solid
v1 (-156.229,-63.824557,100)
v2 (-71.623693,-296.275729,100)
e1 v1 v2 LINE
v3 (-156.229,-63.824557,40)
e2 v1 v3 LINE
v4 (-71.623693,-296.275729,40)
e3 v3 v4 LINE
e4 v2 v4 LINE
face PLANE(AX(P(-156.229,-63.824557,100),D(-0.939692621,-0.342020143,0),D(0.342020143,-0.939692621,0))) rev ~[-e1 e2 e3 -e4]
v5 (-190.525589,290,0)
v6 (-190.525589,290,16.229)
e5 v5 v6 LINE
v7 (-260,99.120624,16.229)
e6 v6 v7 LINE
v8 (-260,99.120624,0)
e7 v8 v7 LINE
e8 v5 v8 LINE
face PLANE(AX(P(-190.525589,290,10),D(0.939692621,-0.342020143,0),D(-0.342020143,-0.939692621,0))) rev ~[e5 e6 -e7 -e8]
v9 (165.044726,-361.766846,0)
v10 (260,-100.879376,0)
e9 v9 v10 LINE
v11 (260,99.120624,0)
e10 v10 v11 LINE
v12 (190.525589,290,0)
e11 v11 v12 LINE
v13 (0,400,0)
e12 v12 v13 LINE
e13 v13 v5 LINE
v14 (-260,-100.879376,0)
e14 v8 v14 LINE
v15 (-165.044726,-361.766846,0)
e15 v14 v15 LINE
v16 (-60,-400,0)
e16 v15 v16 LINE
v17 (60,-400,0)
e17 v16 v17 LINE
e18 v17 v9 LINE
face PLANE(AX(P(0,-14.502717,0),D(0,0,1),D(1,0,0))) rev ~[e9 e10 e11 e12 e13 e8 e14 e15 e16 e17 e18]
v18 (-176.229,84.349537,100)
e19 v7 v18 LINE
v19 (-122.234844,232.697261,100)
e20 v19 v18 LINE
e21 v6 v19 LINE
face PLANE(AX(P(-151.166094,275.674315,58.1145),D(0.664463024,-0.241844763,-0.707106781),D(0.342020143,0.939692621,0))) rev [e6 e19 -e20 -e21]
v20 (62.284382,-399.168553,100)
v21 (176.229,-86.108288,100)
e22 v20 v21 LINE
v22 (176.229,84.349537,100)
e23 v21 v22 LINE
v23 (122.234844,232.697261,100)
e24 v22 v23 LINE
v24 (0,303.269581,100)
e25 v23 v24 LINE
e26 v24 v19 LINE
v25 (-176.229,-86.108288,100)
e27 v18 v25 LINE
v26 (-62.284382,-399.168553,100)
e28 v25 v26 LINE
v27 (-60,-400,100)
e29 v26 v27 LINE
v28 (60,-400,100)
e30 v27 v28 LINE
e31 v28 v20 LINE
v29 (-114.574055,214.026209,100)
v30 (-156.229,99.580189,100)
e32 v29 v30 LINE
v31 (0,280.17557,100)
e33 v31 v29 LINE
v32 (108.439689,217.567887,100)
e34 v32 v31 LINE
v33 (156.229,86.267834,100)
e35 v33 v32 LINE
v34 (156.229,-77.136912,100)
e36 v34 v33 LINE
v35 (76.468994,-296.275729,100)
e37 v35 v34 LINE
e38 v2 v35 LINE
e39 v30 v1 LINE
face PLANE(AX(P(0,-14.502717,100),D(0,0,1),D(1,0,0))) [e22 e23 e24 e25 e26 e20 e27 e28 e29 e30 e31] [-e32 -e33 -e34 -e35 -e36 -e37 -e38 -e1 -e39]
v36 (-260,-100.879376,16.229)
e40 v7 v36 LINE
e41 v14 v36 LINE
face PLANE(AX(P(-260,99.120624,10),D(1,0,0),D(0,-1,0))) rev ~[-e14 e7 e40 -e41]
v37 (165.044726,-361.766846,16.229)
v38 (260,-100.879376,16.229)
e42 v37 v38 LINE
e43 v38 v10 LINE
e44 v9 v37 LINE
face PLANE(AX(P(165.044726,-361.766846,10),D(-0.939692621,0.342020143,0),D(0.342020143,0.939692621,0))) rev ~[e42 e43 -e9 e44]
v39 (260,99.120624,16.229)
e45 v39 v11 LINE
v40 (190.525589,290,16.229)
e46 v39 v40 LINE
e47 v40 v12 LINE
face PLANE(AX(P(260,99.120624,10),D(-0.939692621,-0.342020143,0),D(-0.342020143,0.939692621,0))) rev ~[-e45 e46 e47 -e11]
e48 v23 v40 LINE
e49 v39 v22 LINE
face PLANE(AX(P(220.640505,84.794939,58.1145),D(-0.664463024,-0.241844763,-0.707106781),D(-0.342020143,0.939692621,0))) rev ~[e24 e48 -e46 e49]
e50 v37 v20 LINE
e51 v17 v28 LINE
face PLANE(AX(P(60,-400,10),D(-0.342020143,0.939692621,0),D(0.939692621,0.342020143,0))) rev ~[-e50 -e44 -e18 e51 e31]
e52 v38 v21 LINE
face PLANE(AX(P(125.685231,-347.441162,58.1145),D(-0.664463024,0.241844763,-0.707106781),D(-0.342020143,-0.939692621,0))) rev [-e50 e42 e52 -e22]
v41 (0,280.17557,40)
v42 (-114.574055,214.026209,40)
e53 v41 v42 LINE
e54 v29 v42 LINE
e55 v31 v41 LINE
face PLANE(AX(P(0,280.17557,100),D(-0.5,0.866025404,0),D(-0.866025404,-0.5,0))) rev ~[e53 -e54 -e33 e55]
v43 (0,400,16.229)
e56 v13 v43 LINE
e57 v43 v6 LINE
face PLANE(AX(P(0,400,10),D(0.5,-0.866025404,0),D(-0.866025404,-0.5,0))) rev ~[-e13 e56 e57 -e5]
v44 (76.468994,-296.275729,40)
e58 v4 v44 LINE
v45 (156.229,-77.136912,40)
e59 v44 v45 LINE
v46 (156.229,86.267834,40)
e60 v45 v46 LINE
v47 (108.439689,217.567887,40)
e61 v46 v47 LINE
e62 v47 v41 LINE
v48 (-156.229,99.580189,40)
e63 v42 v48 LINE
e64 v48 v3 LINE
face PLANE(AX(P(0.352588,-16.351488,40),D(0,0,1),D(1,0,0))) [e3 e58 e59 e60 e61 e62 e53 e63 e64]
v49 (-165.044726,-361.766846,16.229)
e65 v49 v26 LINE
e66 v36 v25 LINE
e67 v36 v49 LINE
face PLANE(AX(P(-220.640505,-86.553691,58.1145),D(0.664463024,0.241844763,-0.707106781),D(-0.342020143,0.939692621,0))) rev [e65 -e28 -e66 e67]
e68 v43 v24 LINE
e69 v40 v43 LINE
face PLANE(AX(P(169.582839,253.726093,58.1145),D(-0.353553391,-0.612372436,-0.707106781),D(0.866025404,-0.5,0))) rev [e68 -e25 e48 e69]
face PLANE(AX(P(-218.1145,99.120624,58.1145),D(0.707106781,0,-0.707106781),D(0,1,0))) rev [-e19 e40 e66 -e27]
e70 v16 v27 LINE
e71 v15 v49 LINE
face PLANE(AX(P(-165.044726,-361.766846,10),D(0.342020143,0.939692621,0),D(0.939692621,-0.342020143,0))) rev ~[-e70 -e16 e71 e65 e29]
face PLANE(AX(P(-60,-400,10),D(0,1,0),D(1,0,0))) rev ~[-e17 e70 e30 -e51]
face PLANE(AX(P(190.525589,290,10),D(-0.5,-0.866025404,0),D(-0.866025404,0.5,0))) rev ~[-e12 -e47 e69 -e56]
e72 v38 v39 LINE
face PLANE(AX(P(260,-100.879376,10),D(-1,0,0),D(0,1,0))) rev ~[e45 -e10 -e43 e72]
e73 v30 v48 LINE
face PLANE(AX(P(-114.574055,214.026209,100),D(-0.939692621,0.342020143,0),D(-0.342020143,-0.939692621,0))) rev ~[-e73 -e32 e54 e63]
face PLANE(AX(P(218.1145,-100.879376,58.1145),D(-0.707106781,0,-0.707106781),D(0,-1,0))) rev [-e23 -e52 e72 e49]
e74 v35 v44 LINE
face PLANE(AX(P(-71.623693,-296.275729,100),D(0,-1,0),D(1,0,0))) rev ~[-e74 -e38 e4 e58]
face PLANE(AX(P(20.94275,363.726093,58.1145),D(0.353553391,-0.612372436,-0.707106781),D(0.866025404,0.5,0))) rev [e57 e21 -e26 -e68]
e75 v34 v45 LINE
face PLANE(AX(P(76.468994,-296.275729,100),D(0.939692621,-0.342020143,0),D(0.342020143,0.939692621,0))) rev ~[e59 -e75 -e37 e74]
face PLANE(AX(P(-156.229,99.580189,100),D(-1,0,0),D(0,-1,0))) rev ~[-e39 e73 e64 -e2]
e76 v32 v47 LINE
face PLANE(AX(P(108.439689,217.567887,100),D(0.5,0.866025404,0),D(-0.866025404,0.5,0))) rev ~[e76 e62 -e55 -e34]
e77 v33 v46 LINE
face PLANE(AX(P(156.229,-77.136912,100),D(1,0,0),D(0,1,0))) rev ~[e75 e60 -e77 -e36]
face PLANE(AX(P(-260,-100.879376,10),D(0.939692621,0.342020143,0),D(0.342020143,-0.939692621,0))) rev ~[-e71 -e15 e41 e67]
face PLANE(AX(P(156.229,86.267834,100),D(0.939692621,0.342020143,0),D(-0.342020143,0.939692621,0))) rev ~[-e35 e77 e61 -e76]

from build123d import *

# Parameters (mm, degrees)
F1_DEPTH = 10
F2_DEPTH = 90
F3_SIZE2 = 83.771
F3_SIZE  = 83.771
F5_DEPTH = 60


# Not quite as in the source:
# - a feature names something its author has since deleted; it is built from what else it names


with BuildPart() as f1:
    # F0 (on Top) → F1 (new body)
    with BuildSketch(Plane.XY):
        Polygon((190.5255888326, 290), (0, 400), (-190.5255888326, 290), (-260, 99.1206240876), (-260, -100.8793759124), (-165.0447262585, -361.7668463753), (-60, -400), (60, -400), (165.0447262585, -361.7668463753), (260, -100.8793759124), (260, 99.1206240876), align=None)
    extrude(amount=F1_DEPTH)

    # F2 (add): a face of the model
    f2_faces = [f1.faces().sort_by_distance(p)[0] for p in [
        (0, -14.4086757736, 10),
    ]]
    extrude(f2_faces, amount=F2_DEPTH)

    # F3
    f3_edges = [f1.edges().sort_by_distance(p)[0] for p in [
        (-212.522363, -231.323111, 100),
        (212.522363, -231.323111, 100),
        (260, -0.879376, 100),
        (225.262794, 194.560312, 100),
        (95.262794, 345, 100),
        (-95.262794, 345, 100),
        (-225.262794, 194.560312, 100),
        (-260, -0.879376, 100),
    ]]
    chamfer(f3_edges, length=F3_SIZE, length2=F3_SIZE2)

    # F4 (on face) → F5 (cut)
    with BuildSketch(Plane.XY.offset(100)):
        Polygon((-114.5740551886, 214.0262088265), (-156.229, 99.5801885487), (-156.229, -63.8245572211), (-71.6236926582, -296.2757287087), (76.4689935111, -296.2757287087), (156.229, -77.136911905), (156.229, 86.2678338648), (108.4396889686, 217.567886815), (0, 280.1755704318), align=None)
    extrude(amount=-F5_DEPTH, mode=Mode.SUBTRACT)


solid = f1.part
